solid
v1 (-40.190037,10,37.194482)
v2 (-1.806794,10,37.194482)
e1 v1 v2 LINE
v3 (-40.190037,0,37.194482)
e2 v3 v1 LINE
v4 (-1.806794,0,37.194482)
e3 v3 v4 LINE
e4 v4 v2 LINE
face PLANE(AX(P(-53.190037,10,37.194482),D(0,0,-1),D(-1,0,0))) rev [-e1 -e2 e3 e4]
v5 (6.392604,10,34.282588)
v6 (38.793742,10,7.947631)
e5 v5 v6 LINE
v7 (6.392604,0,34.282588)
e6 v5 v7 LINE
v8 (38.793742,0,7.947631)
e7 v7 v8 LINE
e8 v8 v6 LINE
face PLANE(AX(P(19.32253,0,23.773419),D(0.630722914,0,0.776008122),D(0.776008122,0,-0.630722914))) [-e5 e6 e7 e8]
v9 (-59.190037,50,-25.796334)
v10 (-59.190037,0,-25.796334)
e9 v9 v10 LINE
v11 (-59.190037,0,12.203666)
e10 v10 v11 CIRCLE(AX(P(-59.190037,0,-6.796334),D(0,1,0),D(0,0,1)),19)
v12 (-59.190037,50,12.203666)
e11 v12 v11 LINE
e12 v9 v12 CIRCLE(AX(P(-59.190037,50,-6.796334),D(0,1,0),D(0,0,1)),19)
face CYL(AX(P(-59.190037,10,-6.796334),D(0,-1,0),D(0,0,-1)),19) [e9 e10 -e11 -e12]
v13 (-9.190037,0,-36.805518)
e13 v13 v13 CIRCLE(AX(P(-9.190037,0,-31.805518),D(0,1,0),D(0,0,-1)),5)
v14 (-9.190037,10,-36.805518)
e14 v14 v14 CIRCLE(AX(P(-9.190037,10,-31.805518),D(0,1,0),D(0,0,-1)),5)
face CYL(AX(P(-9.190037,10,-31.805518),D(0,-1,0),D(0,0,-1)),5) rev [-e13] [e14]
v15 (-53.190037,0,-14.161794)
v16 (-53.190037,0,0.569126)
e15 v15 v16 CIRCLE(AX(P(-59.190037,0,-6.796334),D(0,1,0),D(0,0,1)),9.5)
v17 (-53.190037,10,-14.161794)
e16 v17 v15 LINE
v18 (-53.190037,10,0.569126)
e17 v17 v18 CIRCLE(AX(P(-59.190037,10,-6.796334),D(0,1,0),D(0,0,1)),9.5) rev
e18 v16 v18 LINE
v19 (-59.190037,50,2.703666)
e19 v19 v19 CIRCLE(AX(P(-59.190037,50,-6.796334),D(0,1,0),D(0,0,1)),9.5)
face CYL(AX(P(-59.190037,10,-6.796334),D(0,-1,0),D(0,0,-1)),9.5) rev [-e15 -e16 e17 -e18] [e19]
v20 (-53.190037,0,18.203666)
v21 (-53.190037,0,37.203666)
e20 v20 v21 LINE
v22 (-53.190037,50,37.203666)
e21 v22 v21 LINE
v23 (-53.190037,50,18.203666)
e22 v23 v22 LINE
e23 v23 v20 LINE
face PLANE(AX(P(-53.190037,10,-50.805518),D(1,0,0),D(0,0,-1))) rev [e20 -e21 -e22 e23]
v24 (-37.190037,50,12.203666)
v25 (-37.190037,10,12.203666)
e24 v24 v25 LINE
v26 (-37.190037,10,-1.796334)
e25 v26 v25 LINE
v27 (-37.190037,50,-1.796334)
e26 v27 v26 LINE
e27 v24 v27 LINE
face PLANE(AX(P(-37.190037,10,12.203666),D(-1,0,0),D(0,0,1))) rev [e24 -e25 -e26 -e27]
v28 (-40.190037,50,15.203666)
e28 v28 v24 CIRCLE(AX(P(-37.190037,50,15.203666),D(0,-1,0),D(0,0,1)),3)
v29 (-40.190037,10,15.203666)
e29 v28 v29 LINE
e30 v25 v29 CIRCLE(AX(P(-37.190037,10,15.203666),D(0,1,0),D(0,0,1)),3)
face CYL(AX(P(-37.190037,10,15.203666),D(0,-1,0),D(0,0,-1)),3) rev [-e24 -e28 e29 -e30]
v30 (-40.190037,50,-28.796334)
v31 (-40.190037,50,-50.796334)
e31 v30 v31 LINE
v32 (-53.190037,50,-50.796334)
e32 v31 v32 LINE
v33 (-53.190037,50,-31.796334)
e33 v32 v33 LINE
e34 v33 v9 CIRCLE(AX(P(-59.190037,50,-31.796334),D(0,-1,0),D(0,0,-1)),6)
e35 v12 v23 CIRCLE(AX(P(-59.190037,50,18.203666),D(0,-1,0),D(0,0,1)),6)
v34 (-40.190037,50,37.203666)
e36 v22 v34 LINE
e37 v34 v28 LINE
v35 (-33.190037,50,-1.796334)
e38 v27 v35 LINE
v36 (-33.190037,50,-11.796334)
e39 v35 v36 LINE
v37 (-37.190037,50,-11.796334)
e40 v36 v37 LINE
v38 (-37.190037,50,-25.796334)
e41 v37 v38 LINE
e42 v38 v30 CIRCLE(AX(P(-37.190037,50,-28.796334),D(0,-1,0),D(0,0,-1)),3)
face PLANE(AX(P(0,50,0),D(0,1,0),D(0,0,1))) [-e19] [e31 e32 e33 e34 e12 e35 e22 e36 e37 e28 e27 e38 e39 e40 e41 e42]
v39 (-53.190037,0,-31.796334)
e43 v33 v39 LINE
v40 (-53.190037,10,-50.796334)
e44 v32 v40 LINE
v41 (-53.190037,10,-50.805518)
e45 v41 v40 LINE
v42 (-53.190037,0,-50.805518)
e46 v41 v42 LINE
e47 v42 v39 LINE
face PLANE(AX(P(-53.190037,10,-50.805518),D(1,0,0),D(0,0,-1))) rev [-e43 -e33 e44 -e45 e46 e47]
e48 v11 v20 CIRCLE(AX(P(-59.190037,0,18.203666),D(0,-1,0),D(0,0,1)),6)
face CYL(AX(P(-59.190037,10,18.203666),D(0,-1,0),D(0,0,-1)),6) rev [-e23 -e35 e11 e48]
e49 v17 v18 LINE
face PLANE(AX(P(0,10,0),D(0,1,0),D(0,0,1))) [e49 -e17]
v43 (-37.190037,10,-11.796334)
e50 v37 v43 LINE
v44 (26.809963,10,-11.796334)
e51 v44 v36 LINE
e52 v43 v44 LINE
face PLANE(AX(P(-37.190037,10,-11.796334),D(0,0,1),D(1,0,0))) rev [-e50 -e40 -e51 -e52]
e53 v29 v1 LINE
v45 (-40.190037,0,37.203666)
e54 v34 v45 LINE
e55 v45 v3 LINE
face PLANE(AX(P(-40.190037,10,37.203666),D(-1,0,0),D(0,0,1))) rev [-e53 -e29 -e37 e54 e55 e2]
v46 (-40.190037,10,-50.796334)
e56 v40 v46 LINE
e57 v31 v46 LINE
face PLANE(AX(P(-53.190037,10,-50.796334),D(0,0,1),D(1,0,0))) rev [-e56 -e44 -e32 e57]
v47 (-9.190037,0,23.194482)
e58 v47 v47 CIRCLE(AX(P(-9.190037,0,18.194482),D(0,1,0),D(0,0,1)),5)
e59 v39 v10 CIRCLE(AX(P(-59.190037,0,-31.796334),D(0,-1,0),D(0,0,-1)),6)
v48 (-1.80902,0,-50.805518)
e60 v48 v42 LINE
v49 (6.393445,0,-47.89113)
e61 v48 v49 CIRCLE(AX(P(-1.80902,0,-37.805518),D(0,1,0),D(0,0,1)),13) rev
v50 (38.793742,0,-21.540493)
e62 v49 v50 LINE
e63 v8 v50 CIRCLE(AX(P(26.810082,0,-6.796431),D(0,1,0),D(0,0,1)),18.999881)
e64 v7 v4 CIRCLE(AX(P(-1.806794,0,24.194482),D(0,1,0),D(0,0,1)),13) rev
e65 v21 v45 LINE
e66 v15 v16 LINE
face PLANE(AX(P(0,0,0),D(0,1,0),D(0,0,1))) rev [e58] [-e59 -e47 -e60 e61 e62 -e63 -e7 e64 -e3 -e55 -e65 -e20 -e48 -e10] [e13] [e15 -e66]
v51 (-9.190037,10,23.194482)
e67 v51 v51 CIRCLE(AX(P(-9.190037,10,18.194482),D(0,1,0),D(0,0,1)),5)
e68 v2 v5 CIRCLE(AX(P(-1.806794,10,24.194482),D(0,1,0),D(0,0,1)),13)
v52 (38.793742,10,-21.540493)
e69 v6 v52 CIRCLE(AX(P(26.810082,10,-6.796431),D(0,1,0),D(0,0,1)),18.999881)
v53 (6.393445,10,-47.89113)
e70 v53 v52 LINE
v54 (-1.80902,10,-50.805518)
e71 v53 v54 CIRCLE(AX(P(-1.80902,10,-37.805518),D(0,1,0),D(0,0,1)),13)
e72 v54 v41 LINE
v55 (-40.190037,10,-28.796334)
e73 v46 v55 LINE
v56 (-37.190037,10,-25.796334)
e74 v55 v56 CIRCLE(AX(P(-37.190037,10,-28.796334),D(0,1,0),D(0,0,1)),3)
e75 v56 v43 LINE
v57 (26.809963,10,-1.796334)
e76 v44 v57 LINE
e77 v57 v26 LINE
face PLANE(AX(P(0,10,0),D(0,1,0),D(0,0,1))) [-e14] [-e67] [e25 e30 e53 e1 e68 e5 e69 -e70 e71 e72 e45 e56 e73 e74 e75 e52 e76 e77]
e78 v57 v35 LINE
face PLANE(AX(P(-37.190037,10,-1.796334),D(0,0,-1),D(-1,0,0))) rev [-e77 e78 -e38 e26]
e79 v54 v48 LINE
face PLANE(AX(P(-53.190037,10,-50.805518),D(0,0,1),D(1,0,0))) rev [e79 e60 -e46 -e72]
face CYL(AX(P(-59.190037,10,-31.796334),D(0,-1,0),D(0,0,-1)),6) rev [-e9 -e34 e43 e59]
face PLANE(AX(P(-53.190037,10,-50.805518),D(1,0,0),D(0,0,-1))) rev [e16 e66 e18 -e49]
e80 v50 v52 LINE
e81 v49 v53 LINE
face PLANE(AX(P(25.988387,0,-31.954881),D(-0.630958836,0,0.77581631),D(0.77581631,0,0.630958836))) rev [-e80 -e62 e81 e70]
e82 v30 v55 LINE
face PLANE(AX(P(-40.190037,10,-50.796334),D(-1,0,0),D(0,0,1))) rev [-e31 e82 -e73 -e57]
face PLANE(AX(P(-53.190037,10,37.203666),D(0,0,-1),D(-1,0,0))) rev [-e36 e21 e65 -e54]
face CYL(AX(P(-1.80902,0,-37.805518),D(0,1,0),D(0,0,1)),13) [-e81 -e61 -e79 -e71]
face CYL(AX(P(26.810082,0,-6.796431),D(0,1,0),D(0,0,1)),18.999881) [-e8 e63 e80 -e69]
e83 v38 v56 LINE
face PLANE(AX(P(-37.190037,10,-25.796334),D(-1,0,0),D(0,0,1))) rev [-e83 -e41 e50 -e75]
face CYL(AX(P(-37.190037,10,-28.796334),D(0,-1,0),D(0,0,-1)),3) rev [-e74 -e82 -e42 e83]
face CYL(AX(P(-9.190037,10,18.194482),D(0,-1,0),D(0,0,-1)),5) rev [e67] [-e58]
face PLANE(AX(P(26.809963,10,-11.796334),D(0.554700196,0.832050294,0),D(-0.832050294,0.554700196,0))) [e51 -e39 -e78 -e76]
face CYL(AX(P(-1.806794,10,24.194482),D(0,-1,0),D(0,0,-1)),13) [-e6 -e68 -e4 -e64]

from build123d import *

# Parameters (mm, degrees)
SKETCH1_W               = 99
SKETCH1_H               = 88
SKETCH1_R               = 5
BOSS_EXTRUDE1_DEPTH     = 10
BOSS_EXTRUDE2_OUTLINE_R = 9.5
BOSS_EXTRUDE2_DEPTH     = 50
BOSS_EXTRUDE3_DEPTH     = 5
CUT_EXTRUDE3_DEPTH      = 10
FILLET1_R               = 13
FILLET2_R               = 13


# Read off the part's stored shape, not the designer's step: Boss-Extrude2
with BuildPart() as part:
    # Sketch1 → Boss-Extrude1 (new body)
    with BuildSketch(Plane(origin=(0, 0, 0), x_dir=(1, 0, 0), z_dir=(0, 1, 0))):
        with Locations((-3.690036969, 6.805517627)):
            Rectangle(SKETCH1_W, SKETCH1_H)
        with Locations(Location((-9.190036969, -18.194482373, 0), (0, 0, 270))):
            Circle(SKETCH1_R, mode=Mode.SUBTRACT)
        with Locations(Location((-9.190036969, 31.805517627, 0), (0, 0, 90))):
            Circle(SKETCH1_R, mode=Mode.SUBTRACT)
    extrude(amount=BOSS_EXTRUDE1_DEPTH)

    # Boss-Extrude2 outline → Boss-Extrude2 (add)
    with BuildSketch(Plane(origin=(0, 0, 0), x_dir=(1, 0, 0), z_dir=(0, 1, 0))):
        with BuildLine():
            ThreePointArc((-59.190036969, -12.203665814), (-54.947396282, -13.961025127), (-53.190036969, -18.203665814))
            Line((-53.190036969, -18.203665814), (-53.190036969, -37.203665814))
            Line((-53.190036969, -37.203665814), (-40.190036969, -37.203665814))
            Line((-40.190036969, -37.203665814), (-40.190036969, -15.203665814))
            ThreePointArc((-40.190036969, -15.203665814), (-39.311357313, -13.08234547), (-37.190036969, -12.203665814))
            Line((-37.190036969, -12.203665814), (-37.190036969, 1.796334186))
            Line((-37.190036969, 1.796334186), (-33.190036969, 1.796334186))
            Line((-33.190036969, 1.796334186), (-33.190036969, 11.796334186))
            Line((-33.190036969, 11.796334186), (-37.190036969, 11.796334186))
            Line((-37.190036969, 11.796334186), (-37.190036969, 25.796334186))
            ThreePointArc((-37.190036969, 25.796334186), (-39.311357313, 26.675013842), (-40.190036969, 28.796334186))
            Line((-40.190036969, 28.796334186), (-40.190036969, 50.796334186))
            Line((-40.190036969, 50.796334186), (-53.190036969, 50.796334186))
            Line((-53.190036969, 50.796334186), (-53.190036969, 31.796334186))
            ThreePointArc((-53.190036969, 31.796334186), (-54.947396282, 27.553693499), (-59.190036969, 25.796334186))
            ThreePointArc((-59.190036969, 25.796334186), (-78.190036969, 6.796334186), (-59.190036969, -12.203665814))
        make_face()
        with Locations((-59.190036969, 6.796334186)):
            Circle(BOSS_EXTRUDE2_OUTLINE_R, mode=Mode.SUBTRACT)
    extrude(amount=BOSS_EXTRUDE2_DEPTH)

    # 3DSketch2 → Boss-Extrude3 (add, symmetric)
    with BuildSketch(Plane(origin=(-33.190036969, 10, -6.796334186), x_dir=(1, 0, 0), z_dir=(0, 0, 1))):
        Polygon((0, 0), (60, 0), (0, 40), align=None)
    extrude(amount=BOSS_EXTRUDE3_DEPTH, both=True)

    # Sketch2 → Cut-Extrude3 (cut)
    with BuildSketch(Plane(origin=(0, 10, 0), x_dir=(1, 0, 0), z_dir=(0, 1, 0))):
        with BuildLine():
            ThreePointArc((38.793742347, 21.540492879), (43.966474405, 14.960601333), (45.809963031, 6.796430868))
            Line((45.809963031, 6.796430868), (45.809963031, 50.805517627))
            Line((45.809963031, 50.805517627), (2.809963031, 50.805517627))
            Line((2.809963031, 50.805517627), (38.793742347, 21.540492879))
        make_face()
        with BuildLine():
            Line((38.793742347, -7.947631063), (2.809963031, -37.194482373))
            Line((2.809963031, -37.194482373), (45.809963031, -37.194482373))
            Line((45.809963031, -37.194482373), (45.809963031, 6.796430868))
            ThreePointArc((45.809963031, 6.796430868), (43.966474387, -1.367739553), (38.793742347, -7.947631063))
        make_face()
    extrude(amount=-CUT_EXTRUDE3_DEPTH, mode=Mode.SUBTRACT)

    # Fillet1
    fillet1_edges = [part.edges().sort_by_distance(p)[0] for p in [
        (2.809963031, 5, 37.194482373),
    ]]
    fillet(fillet1_edges, radius=FILLET1_R)

    # Fillet2
    fillet2_edges = [part.edges().sort_by_distance(p)[0] for p in [
        (2.809963031, 5, -50.805517627),
    ]]
    fillet(fillet2_edges, radius=FILLET2_R)


solid = part.part
